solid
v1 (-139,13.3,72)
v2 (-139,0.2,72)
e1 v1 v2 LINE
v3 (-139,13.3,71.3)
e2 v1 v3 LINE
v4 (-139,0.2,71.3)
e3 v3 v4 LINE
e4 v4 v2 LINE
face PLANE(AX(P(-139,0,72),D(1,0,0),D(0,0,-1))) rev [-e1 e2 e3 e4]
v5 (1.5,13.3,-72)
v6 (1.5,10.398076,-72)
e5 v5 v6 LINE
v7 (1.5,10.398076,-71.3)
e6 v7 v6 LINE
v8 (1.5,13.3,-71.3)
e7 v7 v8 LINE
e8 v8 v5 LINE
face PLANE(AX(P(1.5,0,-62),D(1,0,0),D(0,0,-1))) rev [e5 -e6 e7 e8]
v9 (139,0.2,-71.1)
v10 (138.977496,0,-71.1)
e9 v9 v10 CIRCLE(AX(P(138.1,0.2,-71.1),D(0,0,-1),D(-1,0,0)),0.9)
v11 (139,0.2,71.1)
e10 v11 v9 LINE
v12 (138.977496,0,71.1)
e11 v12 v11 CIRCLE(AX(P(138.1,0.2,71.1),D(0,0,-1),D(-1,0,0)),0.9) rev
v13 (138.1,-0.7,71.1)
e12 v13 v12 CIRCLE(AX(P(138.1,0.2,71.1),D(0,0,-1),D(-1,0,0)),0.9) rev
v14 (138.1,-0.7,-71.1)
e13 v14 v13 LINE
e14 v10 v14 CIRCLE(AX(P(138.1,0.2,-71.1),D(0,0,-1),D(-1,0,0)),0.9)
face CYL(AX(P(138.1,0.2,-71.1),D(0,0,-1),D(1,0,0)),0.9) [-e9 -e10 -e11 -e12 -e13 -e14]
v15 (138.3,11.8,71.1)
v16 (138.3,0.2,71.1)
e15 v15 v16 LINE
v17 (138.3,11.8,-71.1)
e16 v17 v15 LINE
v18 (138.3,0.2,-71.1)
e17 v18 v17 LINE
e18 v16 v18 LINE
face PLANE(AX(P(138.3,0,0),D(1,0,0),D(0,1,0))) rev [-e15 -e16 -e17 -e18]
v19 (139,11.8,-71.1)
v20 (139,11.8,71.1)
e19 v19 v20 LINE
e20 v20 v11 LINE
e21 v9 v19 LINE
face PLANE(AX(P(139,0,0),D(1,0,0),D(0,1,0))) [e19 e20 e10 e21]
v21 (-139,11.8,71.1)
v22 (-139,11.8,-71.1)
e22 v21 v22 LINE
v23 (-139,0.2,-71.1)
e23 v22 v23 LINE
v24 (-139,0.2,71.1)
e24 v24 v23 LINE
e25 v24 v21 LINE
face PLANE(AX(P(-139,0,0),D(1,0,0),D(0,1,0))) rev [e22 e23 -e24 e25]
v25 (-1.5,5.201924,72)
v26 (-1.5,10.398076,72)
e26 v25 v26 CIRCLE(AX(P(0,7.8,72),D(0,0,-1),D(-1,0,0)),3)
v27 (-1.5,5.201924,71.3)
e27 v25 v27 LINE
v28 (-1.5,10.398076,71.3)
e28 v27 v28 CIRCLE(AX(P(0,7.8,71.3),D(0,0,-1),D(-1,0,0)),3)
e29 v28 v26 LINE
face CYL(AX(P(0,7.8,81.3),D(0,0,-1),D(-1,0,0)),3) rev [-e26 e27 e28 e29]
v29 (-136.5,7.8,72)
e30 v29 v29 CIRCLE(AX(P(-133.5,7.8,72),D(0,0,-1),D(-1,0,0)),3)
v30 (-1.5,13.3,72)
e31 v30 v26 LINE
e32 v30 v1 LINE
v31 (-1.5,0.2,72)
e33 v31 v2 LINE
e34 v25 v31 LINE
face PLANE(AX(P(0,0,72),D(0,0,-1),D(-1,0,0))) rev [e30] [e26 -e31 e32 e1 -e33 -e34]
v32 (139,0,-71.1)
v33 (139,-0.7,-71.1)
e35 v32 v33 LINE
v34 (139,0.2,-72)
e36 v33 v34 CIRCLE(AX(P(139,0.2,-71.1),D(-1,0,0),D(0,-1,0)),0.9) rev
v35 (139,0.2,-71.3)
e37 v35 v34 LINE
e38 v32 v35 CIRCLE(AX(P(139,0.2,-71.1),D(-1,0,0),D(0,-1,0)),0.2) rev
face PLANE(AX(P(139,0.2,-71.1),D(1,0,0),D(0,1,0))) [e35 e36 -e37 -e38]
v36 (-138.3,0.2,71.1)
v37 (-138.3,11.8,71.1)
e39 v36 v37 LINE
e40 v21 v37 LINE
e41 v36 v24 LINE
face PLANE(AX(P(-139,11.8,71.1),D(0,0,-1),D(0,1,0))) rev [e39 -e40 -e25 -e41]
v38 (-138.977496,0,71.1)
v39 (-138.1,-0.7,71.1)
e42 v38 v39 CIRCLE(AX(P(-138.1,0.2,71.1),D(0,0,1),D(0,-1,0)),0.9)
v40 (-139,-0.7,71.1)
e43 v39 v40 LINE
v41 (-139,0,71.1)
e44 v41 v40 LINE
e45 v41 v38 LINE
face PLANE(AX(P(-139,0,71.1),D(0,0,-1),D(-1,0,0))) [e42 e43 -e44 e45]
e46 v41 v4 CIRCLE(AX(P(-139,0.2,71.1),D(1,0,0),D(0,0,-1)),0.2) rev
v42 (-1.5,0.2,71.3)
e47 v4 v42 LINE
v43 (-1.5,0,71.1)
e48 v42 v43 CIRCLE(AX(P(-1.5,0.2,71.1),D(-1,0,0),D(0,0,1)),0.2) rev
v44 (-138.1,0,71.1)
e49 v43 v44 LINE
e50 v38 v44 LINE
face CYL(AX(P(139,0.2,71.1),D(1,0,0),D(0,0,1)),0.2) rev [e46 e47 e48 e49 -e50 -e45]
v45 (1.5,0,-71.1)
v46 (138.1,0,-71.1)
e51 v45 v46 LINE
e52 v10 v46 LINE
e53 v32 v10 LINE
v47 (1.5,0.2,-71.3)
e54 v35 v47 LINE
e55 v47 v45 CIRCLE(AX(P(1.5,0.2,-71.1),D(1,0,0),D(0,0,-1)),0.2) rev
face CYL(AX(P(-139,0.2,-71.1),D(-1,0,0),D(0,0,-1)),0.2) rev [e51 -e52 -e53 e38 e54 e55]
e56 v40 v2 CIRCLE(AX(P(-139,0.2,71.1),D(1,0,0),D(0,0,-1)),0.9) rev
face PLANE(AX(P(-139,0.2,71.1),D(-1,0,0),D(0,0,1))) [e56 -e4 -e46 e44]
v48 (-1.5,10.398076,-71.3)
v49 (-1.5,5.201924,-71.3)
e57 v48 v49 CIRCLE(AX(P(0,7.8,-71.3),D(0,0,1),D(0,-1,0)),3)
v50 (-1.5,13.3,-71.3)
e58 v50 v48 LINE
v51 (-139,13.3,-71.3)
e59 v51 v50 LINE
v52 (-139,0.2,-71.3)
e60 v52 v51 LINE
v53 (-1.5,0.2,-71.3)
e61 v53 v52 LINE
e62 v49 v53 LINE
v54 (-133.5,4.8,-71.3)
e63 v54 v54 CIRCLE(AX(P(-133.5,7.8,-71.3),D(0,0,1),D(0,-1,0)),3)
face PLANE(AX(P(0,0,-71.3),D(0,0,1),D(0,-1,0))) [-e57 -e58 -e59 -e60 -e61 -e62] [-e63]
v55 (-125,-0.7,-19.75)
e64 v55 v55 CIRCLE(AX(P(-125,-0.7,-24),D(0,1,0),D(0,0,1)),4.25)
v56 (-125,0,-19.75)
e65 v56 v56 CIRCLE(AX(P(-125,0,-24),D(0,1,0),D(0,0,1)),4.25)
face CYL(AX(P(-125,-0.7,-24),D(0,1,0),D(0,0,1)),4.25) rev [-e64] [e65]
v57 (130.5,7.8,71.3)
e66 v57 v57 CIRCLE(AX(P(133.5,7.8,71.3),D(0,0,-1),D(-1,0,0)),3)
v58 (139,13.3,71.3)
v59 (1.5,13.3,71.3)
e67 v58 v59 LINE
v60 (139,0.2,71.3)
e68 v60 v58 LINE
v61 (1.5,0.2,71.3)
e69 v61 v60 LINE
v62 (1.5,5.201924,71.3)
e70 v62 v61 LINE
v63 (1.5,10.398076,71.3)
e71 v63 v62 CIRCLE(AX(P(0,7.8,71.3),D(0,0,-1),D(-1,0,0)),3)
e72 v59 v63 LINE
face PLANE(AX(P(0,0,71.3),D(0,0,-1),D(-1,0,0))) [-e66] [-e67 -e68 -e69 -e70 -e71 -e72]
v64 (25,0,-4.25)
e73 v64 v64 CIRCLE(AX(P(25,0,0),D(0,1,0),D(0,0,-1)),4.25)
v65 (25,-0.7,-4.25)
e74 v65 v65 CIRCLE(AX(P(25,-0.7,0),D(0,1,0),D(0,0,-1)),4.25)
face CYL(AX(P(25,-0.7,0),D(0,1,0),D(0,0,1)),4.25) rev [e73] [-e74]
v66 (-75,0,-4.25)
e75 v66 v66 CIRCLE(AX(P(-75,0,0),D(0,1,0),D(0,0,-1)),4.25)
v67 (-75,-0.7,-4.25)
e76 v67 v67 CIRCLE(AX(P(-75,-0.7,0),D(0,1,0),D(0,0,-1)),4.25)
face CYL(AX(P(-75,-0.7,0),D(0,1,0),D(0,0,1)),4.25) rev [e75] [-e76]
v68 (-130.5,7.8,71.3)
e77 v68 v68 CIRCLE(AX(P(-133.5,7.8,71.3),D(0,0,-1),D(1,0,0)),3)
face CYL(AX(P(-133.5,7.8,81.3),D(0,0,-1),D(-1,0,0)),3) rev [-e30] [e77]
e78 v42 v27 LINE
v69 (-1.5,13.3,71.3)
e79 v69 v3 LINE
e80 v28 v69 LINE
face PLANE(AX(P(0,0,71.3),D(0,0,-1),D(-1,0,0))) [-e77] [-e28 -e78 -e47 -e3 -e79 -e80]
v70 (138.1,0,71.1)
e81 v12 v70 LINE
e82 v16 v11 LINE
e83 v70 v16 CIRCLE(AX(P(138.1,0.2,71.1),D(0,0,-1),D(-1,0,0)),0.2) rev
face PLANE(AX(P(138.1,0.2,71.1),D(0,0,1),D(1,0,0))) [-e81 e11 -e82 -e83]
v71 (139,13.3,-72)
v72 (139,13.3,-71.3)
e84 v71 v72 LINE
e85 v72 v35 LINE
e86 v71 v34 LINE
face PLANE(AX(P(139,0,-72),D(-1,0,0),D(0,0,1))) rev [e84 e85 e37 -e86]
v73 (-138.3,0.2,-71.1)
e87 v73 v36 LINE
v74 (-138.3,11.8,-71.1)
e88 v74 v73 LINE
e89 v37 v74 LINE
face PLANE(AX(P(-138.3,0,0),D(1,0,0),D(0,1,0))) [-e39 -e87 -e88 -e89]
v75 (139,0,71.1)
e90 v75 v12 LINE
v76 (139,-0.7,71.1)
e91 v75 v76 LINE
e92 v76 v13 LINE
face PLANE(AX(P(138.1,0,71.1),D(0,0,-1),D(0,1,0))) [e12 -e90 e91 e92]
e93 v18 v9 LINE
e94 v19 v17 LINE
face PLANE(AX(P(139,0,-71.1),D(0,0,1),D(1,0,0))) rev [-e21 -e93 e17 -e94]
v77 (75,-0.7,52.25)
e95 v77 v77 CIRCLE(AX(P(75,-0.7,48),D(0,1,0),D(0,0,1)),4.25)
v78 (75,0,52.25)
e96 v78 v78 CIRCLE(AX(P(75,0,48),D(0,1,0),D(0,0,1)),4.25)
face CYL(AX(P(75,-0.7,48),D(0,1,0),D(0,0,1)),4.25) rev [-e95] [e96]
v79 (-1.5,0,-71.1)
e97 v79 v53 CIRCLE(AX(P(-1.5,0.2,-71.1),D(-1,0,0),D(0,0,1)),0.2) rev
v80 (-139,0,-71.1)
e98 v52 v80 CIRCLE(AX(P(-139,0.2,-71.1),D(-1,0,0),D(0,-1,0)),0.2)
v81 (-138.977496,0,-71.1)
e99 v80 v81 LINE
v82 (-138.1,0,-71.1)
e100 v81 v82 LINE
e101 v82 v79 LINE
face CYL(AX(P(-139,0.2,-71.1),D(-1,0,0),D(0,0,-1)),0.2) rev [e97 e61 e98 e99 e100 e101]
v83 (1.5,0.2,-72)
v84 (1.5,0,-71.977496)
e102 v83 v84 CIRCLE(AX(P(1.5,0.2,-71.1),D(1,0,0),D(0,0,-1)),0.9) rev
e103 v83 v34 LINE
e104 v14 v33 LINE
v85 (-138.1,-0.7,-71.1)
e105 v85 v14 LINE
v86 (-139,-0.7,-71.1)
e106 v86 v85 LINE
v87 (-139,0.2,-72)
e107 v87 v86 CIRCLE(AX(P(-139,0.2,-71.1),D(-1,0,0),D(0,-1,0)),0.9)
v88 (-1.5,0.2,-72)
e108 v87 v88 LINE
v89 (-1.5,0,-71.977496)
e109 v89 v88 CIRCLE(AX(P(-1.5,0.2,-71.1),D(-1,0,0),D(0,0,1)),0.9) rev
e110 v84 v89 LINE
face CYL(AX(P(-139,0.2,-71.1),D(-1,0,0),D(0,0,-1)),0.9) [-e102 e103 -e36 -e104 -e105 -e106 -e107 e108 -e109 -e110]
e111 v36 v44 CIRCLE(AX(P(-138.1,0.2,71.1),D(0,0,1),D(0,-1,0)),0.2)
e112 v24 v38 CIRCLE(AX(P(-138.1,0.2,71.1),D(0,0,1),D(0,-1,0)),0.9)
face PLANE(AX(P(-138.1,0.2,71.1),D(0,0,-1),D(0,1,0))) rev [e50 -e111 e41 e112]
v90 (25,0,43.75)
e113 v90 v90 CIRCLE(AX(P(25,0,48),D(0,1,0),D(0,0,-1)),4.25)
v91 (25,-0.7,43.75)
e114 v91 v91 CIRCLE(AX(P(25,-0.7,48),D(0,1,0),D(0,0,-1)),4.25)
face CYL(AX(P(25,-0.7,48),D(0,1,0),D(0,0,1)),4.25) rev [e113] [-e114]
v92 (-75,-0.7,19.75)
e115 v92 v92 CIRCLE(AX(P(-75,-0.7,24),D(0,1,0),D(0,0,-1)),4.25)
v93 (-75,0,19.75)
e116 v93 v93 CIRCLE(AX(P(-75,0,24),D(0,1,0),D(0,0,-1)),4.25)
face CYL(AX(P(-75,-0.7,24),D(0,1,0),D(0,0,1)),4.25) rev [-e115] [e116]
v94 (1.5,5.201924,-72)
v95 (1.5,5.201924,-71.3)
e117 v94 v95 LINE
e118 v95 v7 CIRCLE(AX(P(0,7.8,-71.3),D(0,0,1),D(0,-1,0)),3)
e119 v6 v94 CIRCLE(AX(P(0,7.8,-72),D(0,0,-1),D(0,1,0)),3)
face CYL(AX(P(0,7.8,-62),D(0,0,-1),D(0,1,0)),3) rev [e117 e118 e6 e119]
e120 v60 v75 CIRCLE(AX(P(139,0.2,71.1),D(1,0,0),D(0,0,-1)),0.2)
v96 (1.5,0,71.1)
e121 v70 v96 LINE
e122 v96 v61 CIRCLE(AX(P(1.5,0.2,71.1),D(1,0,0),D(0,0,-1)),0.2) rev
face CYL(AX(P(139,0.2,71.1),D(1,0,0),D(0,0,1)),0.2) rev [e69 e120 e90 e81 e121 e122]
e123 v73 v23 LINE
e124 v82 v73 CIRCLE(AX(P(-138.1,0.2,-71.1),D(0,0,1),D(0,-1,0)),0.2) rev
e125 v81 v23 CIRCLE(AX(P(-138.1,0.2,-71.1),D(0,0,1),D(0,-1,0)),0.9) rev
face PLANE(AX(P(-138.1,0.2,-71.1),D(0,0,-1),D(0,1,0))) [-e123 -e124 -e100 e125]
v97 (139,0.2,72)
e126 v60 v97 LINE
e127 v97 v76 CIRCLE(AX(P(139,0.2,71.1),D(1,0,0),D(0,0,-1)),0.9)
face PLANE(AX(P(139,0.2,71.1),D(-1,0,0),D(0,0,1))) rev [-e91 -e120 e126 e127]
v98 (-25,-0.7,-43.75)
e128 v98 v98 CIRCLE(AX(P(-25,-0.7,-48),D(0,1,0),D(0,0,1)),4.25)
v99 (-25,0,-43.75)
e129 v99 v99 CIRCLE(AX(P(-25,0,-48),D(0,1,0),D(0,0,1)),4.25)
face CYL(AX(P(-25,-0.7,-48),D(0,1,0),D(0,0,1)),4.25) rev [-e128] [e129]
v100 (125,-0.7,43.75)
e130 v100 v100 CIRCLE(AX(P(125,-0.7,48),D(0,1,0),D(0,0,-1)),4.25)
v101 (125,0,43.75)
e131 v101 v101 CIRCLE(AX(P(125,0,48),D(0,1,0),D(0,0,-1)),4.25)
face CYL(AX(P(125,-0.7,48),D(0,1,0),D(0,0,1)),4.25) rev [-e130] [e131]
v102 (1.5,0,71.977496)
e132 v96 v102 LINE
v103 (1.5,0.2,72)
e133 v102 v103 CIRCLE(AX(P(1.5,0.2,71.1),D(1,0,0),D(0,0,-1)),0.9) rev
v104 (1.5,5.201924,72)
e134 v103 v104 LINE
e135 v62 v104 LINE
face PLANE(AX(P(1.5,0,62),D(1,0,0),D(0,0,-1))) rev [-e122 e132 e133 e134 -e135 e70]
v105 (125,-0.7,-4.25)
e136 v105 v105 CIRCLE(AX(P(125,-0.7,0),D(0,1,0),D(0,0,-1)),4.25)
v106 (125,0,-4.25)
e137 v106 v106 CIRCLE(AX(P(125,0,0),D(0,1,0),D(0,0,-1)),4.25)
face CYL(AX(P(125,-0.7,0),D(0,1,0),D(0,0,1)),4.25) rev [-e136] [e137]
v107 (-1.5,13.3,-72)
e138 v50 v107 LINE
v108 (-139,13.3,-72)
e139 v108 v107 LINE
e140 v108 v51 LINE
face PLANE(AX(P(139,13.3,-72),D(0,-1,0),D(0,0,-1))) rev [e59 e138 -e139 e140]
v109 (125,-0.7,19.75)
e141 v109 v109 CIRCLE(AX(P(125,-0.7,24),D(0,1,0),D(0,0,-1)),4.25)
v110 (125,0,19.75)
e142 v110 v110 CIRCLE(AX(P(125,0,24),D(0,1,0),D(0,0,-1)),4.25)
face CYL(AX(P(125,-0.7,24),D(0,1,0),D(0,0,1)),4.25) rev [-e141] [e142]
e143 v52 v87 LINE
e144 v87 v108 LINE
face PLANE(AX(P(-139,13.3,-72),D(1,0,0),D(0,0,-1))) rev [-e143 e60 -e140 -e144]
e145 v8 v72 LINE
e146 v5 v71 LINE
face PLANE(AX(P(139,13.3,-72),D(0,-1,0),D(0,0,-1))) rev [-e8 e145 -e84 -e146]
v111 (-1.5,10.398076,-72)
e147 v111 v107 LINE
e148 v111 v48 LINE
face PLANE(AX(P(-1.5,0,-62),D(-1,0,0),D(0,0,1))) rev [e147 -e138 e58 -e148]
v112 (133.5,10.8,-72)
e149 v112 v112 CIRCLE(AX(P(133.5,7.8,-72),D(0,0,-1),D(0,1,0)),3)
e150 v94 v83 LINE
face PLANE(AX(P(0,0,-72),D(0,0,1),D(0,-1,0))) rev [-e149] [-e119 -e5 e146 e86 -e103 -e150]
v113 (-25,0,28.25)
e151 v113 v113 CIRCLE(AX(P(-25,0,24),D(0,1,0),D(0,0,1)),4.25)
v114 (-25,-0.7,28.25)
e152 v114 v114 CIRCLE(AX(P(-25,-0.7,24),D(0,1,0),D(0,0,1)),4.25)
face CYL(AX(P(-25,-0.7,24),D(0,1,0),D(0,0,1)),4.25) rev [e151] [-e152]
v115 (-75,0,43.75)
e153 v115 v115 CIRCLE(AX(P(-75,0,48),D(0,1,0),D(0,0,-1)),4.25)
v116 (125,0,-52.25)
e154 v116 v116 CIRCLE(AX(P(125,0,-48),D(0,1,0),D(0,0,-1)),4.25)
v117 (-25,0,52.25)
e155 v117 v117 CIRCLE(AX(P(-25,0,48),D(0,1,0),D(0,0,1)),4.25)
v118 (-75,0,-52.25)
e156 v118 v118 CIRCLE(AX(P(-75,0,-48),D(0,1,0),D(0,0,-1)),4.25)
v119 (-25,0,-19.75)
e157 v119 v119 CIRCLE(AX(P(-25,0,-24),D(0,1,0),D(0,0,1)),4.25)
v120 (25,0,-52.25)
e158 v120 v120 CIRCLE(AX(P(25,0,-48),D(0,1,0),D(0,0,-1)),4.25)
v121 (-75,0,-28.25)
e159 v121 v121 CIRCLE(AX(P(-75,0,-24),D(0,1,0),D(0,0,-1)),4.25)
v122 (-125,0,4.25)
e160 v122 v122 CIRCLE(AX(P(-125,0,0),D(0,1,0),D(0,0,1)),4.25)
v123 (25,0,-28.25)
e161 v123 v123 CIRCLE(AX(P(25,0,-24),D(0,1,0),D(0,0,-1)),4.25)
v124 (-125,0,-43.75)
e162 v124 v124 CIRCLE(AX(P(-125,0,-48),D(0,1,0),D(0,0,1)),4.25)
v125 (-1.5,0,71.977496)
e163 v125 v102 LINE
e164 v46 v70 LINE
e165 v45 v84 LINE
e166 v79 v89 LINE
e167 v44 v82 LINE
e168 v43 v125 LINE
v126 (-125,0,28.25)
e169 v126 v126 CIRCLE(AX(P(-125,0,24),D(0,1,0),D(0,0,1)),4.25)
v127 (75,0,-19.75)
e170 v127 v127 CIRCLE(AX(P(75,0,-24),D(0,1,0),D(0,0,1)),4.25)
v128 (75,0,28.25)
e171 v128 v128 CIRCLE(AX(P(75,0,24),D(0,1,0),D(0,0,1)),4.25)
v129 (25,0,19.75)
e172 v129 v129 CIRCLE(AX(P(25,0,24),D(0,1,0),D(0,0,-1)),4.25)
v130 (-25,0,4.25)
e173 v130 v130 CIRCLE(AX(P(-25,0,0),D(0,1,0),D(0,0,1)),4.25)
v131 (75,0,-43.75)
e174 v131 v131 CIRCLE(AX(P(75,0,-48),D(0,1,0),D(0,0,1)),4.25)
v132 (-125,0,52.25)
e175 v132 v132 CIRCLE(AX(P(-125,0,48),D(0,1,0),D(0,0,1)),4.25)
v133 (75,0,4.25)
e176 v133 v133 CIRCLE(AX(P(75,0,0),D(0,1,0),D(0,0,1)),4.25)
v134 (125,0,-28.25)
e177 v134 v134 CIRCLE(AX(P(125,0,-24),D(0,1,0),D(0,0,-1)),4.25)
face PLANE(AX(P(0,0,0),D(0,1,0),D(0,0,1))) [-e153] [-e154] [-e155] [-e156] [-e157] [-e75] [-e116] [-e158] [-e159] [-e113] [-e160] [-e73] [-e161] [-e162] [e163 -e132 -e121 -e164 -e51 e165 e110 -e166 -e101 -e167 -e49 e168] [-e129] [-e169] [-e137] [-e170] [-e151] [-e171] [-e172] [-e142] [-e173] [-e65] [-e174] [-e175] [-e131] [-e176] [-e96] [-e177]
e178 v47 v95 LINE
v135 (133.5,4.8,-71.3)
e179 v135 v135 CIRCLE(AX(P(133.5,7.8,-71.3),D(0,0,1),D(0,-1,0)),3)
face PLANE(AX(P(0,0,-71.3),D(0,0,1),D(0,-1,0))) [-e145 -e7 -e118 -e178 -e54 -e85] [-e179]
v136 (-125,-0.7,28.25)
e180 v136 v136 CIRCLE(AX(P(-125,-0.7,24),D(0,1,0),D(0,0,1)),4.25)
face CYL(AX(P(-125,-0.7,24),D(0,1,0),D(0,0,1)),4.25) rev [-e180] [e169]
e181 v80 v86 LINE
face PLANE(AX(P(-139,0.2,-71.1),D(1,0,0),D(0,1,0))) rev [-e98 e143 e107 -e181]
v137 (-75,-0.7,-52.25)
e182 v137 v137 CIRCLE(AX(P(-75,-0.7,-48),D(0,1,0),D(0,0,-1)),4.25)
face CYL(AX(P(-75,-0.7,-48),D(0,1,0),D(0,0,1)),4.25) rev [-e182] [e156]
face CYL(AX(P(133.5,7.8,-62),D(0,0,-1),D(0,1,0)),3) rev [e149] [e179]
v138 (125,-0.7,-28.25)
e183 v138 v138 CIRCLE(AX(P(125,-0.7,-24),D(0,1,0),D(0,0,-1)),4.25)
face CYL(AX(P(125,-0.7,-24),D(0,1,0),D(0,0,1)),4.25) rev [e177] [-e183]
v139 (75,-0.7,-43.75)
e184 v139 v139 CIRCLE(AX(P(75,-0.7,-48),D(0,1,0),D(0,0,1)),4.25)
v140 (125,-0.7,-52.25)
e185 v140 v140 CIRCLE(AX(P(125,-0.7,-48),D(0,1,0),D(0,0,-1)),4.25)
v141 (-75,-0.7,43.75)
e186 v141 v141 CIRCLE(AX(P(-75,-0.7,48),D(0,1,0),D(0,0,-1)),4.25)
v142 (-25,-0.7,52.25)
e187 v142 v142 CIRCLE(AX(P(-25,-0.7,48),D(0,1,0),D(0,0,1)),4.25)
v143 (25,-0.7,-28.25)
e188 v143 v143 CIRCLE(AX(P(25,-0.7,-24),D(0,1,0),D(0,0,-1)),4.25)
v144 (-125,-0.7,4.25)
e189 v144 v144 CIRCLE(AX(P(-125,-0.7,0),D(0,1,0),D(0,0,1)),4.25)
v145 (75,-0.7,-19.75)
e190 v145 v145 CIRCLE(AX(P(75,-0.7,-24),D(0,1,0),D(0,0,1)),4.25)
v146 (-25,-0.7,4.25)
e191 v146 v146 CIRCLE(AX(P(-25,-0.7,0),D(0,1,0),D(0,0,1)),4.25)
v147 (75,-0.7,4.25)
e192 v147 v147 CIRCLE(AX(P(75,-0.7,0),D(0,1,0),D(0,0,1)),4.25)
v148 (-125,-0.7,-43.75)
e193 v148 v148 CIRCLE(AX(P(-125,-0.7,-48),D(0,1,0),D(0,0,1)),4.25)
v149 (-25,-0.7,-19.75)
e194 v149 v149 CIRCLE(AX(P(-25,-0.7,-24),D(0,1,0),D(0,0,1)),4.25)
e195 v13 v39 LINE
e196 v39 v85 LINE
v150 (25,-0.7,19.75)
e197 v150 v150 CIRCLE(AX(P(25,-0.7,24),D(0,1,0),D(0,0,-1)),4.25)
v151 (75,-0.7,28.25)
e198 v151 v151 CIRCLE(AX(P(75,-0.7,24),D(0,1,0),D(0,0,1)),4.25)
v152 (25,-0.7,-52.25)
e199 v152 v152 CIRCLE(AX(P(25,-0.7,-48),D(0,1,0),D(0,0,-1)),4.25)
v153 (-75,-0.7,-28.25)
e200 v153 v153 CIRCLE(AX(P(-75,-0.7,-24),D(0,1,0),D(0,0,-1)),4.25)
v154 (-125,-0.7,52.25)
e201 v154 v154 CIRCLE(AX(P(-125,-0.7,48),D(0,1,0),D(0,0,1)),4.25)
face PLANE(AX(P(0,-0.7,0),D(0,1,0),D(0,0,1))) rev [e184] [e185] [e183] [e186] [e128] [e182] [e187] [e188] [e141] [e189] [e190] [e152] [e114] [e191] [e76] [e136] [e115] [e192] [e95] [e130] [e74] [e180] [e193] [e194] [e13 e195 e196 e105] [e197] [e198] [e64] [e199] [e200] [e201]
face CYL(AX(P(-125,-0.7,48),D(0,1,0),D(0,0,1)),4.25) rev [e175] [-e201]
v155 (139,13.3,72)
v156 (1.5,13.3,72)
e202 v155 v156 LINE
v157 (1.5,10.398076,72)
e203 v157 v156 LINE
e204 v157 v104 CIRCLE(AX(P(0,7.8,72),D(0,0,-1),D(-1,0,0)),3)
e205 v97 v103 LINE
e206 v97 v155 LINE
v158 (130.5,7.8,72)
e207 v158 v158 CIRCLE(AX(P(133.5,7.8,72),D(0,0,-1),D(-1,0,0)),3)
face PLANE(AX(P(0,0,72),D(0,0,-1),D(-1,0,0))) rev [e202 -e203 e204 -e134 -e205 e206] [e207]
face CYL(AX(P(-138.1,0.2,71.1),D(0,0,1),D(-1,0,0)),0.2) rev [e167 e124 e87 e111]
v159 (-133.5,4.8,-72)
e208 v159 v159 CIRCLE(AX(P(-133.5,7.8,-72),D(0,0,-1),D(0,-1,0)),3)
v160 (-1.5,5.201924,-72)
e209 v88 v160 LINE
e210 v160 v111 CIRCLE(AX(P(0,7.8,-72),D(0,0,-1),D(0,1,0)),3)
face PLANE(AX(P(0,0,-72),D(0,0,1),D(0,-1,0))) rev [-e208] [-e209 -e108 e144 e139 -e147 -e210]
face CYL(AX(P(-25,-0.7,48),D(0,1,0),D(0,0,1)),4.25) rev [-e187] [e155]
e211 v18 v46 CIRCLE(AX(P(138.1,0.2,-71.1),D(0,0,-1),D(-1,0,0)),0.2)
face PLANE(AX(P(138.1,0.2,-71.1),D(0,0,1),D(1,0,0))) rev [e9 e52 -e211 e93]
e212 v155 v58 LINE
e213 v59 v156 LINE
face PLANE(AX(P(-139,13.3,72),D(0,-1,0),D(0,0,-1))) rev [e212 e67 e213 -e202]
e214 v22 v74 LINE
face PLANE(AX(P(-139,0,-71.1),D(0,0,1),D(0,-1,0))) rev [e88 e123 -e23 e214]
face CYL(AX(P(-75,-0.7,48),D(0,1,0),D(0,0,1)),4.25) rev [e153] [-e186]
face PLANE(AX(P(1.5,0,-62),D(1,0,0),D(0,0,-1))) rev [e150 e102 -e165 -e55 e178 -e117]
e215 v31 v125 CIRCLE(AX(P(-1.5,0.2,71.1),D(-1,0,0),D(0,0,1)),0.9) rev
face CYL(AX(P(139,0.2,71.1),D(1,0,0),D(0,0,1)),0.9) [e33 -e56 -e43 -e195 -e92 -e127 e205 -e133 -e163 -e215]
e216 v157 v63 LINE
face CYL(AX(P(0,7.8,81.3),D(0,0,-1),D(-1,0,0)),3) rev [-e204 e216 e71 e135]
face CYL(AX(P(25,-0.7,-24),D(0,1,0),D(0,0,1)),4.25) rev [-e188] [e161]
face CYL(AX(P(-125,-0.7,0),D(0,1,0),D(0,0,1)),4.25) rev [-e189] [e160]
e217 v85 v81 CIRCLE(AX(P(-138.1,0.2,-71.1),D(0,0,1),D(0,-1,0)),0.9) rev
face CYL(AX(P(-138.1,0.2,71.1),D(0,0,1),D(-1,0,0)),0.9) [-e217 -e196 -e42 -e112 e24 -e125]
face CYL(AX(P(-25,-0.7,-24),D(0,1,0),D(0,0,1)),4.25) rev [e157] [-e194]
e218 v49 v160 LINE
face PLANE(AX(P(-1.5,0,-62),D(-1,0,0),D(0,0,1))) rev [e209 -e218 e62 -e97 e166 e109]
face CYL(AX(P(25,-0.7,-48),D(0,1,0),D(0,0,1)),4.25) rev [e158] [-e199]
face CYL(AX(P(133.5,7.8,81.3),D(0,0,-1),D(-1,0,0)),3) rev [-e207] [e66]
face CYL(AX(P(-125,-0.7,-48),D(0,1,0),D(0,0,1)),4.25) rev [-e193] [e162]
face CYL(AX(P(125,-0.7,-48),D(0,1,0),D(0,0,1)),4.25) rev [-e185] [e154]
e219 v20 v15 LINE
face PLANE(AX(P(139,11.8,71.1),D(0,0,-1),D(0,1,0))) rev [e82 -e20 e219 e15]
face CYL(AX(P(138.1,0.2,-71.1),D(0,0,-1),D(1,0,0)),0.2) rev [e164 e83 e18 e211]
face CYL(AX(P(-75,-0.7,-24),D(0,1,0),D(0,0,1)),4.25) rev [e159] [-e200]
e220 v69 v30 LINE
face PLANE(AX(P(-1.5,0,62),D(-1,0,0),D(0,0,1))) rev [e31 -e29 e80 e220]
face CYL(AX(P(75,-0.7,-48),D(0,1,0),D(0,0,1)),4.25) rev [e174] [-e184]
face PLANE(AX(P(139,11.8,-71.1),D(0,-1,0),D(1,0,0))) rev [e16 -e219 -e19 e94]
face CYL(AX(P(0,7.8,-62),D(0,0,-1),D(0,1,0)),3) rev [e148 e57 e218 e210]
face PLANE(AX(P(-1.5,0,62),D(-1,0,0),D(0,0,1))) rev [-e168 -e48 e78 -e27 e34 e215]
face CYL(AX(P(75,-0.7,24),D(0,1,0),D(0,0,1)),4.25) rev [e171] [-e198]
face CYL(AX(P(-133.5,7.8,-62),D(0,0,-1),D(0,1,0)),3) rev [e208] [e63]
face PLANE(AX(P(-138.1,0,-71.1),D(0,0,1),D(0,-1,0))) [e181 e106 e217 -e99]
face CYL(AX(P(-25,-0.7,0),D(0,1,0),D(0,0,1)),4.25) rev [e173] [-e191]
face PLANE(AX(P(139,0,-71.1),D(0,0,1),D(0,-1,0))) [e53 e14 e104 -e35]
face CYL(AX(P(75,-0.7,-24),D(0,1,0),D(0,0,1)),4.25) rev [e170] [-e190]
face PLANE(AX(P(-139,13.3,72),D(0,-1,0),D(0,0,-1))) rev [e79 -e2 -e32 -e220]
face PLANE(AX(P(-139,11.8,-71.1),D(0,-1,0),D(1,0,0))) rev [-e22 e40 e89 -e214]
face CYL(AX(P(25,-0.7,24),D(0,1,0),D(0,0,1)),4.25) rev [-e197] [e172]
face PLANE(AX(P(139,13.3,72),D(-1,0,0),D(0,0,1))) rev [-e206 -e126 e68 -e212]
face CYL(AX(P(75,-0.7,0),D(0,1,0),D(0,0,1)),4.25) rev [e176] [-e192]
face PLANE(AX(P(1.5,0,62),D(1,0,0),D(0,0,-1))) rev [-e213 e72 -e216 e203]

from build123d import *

# Parameters (mm, degrees)
SKETCH_1_W                         = 278
SKETCH_1_H                         = 144
SKETCH_1_R                         = 4.25
SM_BASE_FLANGE_1_DEPTH             = 0.7
SM_EDGE_FLANGE_1_STRIP_W           = 3.2
SM_EDGE_FLANGE_1_STRIP_H           = 0.7
SM_EDGE_FLANGE_1_STRIP_CUT_DEPTH   = 278
SM_EDGE_FLANGE_1_STRIP_2_W         = 3.2
SM_EDGE_FLANGE_1_STRIP_2_H         = 0.7
SM_EDGE_FLANGE_1_STRIP_CUT_2_DEPTH = 278
SM_EDGE_FLANGE_1_DEPTH             = 278
SM_EDGE_FLANGE_1_BEND_DEPTH        = 278
SKETCH_14_R                        = 3
CUT_EXTRUDE_1_DEPTH                = 10
SKETCH_15_R                        = 3
CUT_EXTRUDE_2_DEPTH                = 10
SKETCH_16_W                        = 3
SKETCH_16_H                        = 13.3
CUT_EXTRUDE_3_DEPTH                = 10
SKETCH_17_W                        = 3
SKETCH_17_H                        = 13.3
CUT_EXTRUDE_4_DEPTH                = 10
SM_EDGE_FLANGE_2_STRIP_W           = 3.2
SM_EDGE_FLANGE_2_STRIP_H           = 0.7
SM_EDGE_FLANGE_2_STRIP_CUT_DEPTH   = 142.2
SM_EDGE_FLANGE_2_STRIP_2_W         = 3.2
SM_EDGE_FLANGE_2_STRIP_2_H         = 0.7
SM_EDGE_FLANGE_2_STRIP_CUT_2_DEPTH = 142.2
SM_EDGE_FLANGE_2_DEPTH             = 142.2
SM_EDGE_FLANGE_2_BEND_DEPTH        = 142.2


# Sheet-metal steps are written as plain solids
with BuildPart() as part:
    # Sketch 1 → 基体-法兰1 (new body)
    with BuildSketch(Plane(origin=(0, 0, 0), x_dir=(1, 0, 0), z_dir=(0, 1, 0))):
        Rectangle(SKETCH_1_W, SKETCH_1_H)
        with Locations(Location((-125, -48, 0), (0, 0, 270))):
            Circle(SKETCH_1_R, mode=Mode.SUBTRACT)
        with Locations(Location((-125, -24, 0), (0, 0, 270))):
            Circle(SKETCH_1_R, mode=Mode.SUBTRACT)
        with Locations(Location((-125, 0, 0), (0, 0, 270))):
            Circle(SKETCH_1_R, mode=Mode.SUBTRACT)
        with Locations(Location((-125, 24, 0), (0, 0, 270))):
            Circle(SKETCH_1_R, mode=Mode.SUBTRACT)
        with Locations(Location((-125, 48, 0), (0, 0, 270))):
            Circle(SKETCH_1_R, mode=Mode.SUBTRACT)
        with Locations(Location((-75, -48, 0), (0, 0, 90))):
            Circle(SKETCH_1_R, mode=Mode.SUBTRACT)
        with Locations(Location((-75, -24, 0), (0, 0, 90))):
            Circle(SKETCH_1_R, mode=Mode.SUBTRACT)
        with Locations(Location((-75, 0, 0), (0, 0, 90))):
            Circle(SKETCH_1_R, mode=Mode.SUBTRACT)
        with Locations(Location((-75, 24, 0), (0, 0, 90))):
            Circle(SKETCH_1_R, mode=Mode.SUBTRACT)
        with Locations(Location((-75, 48, 0), (0, 0, 90))):
            Circle(SKETCH_1_R, mode=Mode.SUBTRACT)
        with Locations(Location((-25, -48, 0), (0, 0, 270))):
            Circle(SKETCH_1_R, mode=Mode.SUBTRACT)
        with Locations(Location((-25, -24, 0), (0, 0, 270))):
            Circle(SKETCH_1_R, mode=Mode.SUBTRACT)
        with Locations(Location((-25, 0, 0), (0, 0, 270))):
            Circle(SKETCH_1_R, mode=Mode.SUBTRACT)
        with Locations(Location((-25, 24, 0), (0, 0, 270))):
            Circle(SKETCH_1_R, mode=Mode.SUBTRACT)
        with Locations(Location((-25, 48, 0), (0, 0, 270))):
            Circle(SKETCH_1_R, mode=Mode.SUBTRACT)
        with Locations(Location((25, -48, 0), (0, 0, 90))):
            Circle(SKETCH_1_R, mode=Mode.SUBTRACT)
        with Locations(Location((25, -24, 0), (0, 0, 90))):
            Circle(SKETCH_1_R, mode=Mode.SUBTRACT)
        with Locations(Location((25, 0, 0), (0, 0, 90))):
            Circle(SKETCH_1_R, mode=Mode.SUBTRACT)
        with Locations(Location((25, 24, 0), (0, 0, 90))):
            Circle(SKETCH_1_R, mode=Mode.SUBTRACT)
        with Locations(Location((25, 48, 0), (0, 0, 90))):
            Circle(SKETCH_1_R, mode=Mode.SUBTRACT)
        with Locations(Location((75, 48, 0), (0, 0, 270))):
            Circle(SKETCH_1_R, mode=Mode.SUBTRACT)
        with Locations(Location((75, 24, 0), (0, 0, 270))):
            Circle(SKETCH_1_R, mode=Mode.SUBTRACT)
        with Locations(Location((75, 0, 0), (0, 0, 270))):
            Circle(SKETCH_1_R, mode=Mode.SUBTRACT)
        with Locations(Location((75, -24, 0), (0, 0, 270))):
            Circle(SKETCH_1_R, mode=Mode.SUBTRACT)
        with Locations(Location((75, -48, 0), (0, 0, 270))):
            Circle(SKETCH_1_R, mode=Mode.SUBTRACT)
        with Locations(Location((125, -48, 0), (0, 0, 90))):
            Circle(SKETCH_1_R, mode=Mode.SUBTRACT)
        with Locations(Location((125, -24, 0), (0, 0, 90))):
            Circle(SKETCH_1_R, mode=Mode.SUBTRACT)
        with Locations(Location((125, 0, 0), (0, 0, 90))):
            Circle(SKETCH_1_R, mode=Mode.SUBTRACT)
        with Locations(Location((125, 24, 0), (0, 0, 90))):
            Circle(SKETCH_1_R, mode=Mode.SUBTRACT)
        with Locations(Location((125, 48, 0), (0, 0, 90))):
            Circle(SKETCH_1_R, mode=Mode.SUBTRACT)
    extrude(amount=-SM_BASE_FLANGE_1_DEPTH)

    # 边线-法兰1 strip (across the edge) → 边线-法兰1 strip cut (cut)
    with BuildSketch(Plane(origin=(-139, 0, 72), x_dir=(0, 0, -1), z_dir=(1, 0, 0))):
        with Locations((-0.7, -0.35)):
            Rectangle(SM_EDGE_FLANGE_1_STRIP_W, SM_EDGE_FLANGE_1_STRIP_H)
    extrude(amount=SM_EDGE_FLANGE_1_STRIP_CUT_DEPTH, mode=Mode.SUBTRACT)

    # 边线-法兰1 strip 2 (across the edge) → 边线-法兰1 strip cut 2 (cut)
    with BuildSketch(Plane(origin=(139, 0, -72), x_dir=(0, 0, 1), z_dir=(-1, 0, 0))):
        with Locations((-0.7, -0.35)):
            Rectangle(SM_EDGE_FLANGE_1_STRIP_2_W, SM_EDGE_FLANGE_1_STRIP_2_H)
    extrude(amount=SM_EDGE_FLANGE_1_STRIP_CUT_2_DEPTH, mode=Mode.SUBTRACT)

    # 边线-法兰1 section (across the edge) → 边线-法兰1 (add)
    with BuildSketch(Plane(origin=(-139, 0, 72), x_dir=(0, 0, -1), z_dir=(1, 0, 0))):
        with BuildLine():
            Line((0, 0.2), (0, 13.3))
            Line((0, 13.3), (0.7, 13.3))
            Line((0.7, 13.3), (0.7, 0.2))
            ThreePointArc((0.7, 0.2), (0.758578644, 0.058578644), (0.9, 0))
            Line((0.9, 0), (0.9, -0.7))
            ThreePointArc((0.9, -0.7), (0.263603897, -0.436396103), (0, 0.2))
        make_face()
    extrude(amount=SM_EDGE_FLANGE_1_DEPTH)

    # 边线-法兰1 section 2 (across the edge) → 边线-法兰1 bend (add)
    with BuildSketch(Plane(origin=(139, 0, -72), x_dir=(0, 0, 1), z_dir=(-1, 0, 0))):
        with BuildLine():
            Line((0, 0.2), (0, 13.3))
            Line((0, 13.3), (0.7, 13.3))
            Line((0.7, 13.3), (0.7, 0.2))
            ThreePointArc((0.7, 0.2), (0.758578644, 0.058578644), (0.9, 0))
            Line((0.9, 0), (0.9, -0.7))
            ThreePointArc((0.9, -0.7), (0.263603897, -0.436396103), (0, 0.2))
        make_face()
    extrude(amount=SM_EDGE_FLANGE_1_BEND_DEPTH)

    # 草图14 → 切除-拉伸1 (cut)
    with BuildSketch(Plane(origin=(0, 0, 71.3), x_dir=(-1, 0, 0), z_dir=(0, 0, -1))):
        with Locations((-133.5, 7.8)):
            Circle(SKETCH_14_R)
        with Locations((0, 7.8)):
            Circle(SKETCH_14_R)
        with Locations((133.5, 7.8)):
            Circle(SKETCH_14_R)
    extrude(amount=-CUT_EXTRUDE_1_DEPTH, mode=Mode.SUBTRACT)

    # 草图15 → 切除-拉伸2 (cut)
    with BuildSketch(Plane(origin=(0, 0, -72), x_dir=(-1, 0, 0), z_dir=(0, 0, -1))):
        with Locations((-133.5, 7.8)):
            Circle(SKETCH_15_R)
        with Locations((0, 7.8)):
            Circle(SKETCH_15_R)
        with Locations((133.5, 7.8)):
            Circle(SKETCH_15_R)
    extrude(amount=-CUT_EXTRUDE_2_DEPTH, mode=Mode.SUBTRACT)

    # 草图16 → 切除-拉伸3 (cut)
    with BuildSketch(Plane(origin=(0, 0, -72), x_dir=(-1, 0, 0), z_dir=(0, 0, -1))):
        with Locations((0, 6.65)):
            Rectangle(SKETCH_16_W, SKETCH_16_H)
    extrude(amount=-CUT_EXTRUDE_3_DEPTH, mode=Mode.SUBTRACT)

    # 草图17 → 切除-拉伸4 (cut)
    with BuildSketch(Plane.XY.offset(72)):
        with Locations((0, 6.65)):
            Rectangle(SKETCH_17_W, SKETCH_17_H)
    extrude(amount=-CUT_EXTRUDE_4_DEPTH, mode=Mode.SUBTRACT)

    # 边线-法兰2 strip (across the edge) → 边线-法兰2 strip cut (cut)
    with BuildSketch(Plane(origin=(-139, 0, -71.1), x_dir=(1, 0, 0), z_dir=(0, 0, 1))):
        with Locations((-0.7, -0.35)):
            Rectangle(SM_EDGE_FLANGE_2_STRIP_W, SM_EDGE_FLANGE_2_STRIP_H)
    extrude(amount=SM_EDGE_FLANGE_2_STRIP_CUT_DEPTH, mode=Mode.SUBTRACT)

    # 边线-法兰2 strip 2 (across the edge) → 边线-法兰2 strip cut 2 (cut)
    with BuildSketch(Plane(origin=(139, 0, 71.1), x_dir=(-1, 0, 0), z_dir=(0, 0, -1))):
        with Locations((-0.7, -0.35)):
            Rectangle(SM_EDGE_FLANGE_2_STRIP_2_W, SM_EDGE_FLANGE_2_STRIP_2_H)
    extrude(amount=SM_EDGE_FLANGE_2_STRIP_CUT_2_DEPTH, mode=Mode.SUBTRACT)

    # 边线-法兰2 section (across the edge) → 边线-法兰2 (add)
    with BuildSketch(Plane(origin=(-139, 0, -71.1), x_dir=(1, 0, 0), z_dir=(0, 0, 1))):
        with BuildLine():
            Line((0, 0.2), (0, 11.8))
            Line((0, 11.8), (0.7, 11.8))
            Line((0.7, 11.8), (0.7, 0.2))
            ThreePointArc((0.7, 0.2), (0.758578644, 0.058578644), (0.9, 0))
            Line((0.9, 0), (0.9, -0.7))
            ThreePointArc((0.9, -0.7), (0.263603897, -0.436396103), (0, 0.2))
        make_face()
    extrude(amount=SM_EDGE_FLANGE_2_DEPTH)

    # 边线-法兰2 section 2 (across the edge) → 边线-法兰2 bend (add)
    with BuildSketch(Plane(origin=(139, 0, 71.1), x_dir=(-1, 0, 0), z_dir=(0, 0, -1))):
        with BuildLine():
            Line((0, 0.2), (0, 11.8))
            Line((0, 11.8), (0.7, 11.8))
            Line((0.7, 11.8), (0.7, 0.2))
            ThreePointArc((0.7, 0.2), (0.758578644, 0.058578644), (0.9, 0))
            Line((0.9, 0), (0.9, -0.7))
            ThreePointArc((0.9, -0.7), (0.263603897, -0.436396103), (0, 0.2))
        make_face()
    extrude(amount=SM_EDGE_FLANGE_2_BEND_DEPTH)


solid = part.part
